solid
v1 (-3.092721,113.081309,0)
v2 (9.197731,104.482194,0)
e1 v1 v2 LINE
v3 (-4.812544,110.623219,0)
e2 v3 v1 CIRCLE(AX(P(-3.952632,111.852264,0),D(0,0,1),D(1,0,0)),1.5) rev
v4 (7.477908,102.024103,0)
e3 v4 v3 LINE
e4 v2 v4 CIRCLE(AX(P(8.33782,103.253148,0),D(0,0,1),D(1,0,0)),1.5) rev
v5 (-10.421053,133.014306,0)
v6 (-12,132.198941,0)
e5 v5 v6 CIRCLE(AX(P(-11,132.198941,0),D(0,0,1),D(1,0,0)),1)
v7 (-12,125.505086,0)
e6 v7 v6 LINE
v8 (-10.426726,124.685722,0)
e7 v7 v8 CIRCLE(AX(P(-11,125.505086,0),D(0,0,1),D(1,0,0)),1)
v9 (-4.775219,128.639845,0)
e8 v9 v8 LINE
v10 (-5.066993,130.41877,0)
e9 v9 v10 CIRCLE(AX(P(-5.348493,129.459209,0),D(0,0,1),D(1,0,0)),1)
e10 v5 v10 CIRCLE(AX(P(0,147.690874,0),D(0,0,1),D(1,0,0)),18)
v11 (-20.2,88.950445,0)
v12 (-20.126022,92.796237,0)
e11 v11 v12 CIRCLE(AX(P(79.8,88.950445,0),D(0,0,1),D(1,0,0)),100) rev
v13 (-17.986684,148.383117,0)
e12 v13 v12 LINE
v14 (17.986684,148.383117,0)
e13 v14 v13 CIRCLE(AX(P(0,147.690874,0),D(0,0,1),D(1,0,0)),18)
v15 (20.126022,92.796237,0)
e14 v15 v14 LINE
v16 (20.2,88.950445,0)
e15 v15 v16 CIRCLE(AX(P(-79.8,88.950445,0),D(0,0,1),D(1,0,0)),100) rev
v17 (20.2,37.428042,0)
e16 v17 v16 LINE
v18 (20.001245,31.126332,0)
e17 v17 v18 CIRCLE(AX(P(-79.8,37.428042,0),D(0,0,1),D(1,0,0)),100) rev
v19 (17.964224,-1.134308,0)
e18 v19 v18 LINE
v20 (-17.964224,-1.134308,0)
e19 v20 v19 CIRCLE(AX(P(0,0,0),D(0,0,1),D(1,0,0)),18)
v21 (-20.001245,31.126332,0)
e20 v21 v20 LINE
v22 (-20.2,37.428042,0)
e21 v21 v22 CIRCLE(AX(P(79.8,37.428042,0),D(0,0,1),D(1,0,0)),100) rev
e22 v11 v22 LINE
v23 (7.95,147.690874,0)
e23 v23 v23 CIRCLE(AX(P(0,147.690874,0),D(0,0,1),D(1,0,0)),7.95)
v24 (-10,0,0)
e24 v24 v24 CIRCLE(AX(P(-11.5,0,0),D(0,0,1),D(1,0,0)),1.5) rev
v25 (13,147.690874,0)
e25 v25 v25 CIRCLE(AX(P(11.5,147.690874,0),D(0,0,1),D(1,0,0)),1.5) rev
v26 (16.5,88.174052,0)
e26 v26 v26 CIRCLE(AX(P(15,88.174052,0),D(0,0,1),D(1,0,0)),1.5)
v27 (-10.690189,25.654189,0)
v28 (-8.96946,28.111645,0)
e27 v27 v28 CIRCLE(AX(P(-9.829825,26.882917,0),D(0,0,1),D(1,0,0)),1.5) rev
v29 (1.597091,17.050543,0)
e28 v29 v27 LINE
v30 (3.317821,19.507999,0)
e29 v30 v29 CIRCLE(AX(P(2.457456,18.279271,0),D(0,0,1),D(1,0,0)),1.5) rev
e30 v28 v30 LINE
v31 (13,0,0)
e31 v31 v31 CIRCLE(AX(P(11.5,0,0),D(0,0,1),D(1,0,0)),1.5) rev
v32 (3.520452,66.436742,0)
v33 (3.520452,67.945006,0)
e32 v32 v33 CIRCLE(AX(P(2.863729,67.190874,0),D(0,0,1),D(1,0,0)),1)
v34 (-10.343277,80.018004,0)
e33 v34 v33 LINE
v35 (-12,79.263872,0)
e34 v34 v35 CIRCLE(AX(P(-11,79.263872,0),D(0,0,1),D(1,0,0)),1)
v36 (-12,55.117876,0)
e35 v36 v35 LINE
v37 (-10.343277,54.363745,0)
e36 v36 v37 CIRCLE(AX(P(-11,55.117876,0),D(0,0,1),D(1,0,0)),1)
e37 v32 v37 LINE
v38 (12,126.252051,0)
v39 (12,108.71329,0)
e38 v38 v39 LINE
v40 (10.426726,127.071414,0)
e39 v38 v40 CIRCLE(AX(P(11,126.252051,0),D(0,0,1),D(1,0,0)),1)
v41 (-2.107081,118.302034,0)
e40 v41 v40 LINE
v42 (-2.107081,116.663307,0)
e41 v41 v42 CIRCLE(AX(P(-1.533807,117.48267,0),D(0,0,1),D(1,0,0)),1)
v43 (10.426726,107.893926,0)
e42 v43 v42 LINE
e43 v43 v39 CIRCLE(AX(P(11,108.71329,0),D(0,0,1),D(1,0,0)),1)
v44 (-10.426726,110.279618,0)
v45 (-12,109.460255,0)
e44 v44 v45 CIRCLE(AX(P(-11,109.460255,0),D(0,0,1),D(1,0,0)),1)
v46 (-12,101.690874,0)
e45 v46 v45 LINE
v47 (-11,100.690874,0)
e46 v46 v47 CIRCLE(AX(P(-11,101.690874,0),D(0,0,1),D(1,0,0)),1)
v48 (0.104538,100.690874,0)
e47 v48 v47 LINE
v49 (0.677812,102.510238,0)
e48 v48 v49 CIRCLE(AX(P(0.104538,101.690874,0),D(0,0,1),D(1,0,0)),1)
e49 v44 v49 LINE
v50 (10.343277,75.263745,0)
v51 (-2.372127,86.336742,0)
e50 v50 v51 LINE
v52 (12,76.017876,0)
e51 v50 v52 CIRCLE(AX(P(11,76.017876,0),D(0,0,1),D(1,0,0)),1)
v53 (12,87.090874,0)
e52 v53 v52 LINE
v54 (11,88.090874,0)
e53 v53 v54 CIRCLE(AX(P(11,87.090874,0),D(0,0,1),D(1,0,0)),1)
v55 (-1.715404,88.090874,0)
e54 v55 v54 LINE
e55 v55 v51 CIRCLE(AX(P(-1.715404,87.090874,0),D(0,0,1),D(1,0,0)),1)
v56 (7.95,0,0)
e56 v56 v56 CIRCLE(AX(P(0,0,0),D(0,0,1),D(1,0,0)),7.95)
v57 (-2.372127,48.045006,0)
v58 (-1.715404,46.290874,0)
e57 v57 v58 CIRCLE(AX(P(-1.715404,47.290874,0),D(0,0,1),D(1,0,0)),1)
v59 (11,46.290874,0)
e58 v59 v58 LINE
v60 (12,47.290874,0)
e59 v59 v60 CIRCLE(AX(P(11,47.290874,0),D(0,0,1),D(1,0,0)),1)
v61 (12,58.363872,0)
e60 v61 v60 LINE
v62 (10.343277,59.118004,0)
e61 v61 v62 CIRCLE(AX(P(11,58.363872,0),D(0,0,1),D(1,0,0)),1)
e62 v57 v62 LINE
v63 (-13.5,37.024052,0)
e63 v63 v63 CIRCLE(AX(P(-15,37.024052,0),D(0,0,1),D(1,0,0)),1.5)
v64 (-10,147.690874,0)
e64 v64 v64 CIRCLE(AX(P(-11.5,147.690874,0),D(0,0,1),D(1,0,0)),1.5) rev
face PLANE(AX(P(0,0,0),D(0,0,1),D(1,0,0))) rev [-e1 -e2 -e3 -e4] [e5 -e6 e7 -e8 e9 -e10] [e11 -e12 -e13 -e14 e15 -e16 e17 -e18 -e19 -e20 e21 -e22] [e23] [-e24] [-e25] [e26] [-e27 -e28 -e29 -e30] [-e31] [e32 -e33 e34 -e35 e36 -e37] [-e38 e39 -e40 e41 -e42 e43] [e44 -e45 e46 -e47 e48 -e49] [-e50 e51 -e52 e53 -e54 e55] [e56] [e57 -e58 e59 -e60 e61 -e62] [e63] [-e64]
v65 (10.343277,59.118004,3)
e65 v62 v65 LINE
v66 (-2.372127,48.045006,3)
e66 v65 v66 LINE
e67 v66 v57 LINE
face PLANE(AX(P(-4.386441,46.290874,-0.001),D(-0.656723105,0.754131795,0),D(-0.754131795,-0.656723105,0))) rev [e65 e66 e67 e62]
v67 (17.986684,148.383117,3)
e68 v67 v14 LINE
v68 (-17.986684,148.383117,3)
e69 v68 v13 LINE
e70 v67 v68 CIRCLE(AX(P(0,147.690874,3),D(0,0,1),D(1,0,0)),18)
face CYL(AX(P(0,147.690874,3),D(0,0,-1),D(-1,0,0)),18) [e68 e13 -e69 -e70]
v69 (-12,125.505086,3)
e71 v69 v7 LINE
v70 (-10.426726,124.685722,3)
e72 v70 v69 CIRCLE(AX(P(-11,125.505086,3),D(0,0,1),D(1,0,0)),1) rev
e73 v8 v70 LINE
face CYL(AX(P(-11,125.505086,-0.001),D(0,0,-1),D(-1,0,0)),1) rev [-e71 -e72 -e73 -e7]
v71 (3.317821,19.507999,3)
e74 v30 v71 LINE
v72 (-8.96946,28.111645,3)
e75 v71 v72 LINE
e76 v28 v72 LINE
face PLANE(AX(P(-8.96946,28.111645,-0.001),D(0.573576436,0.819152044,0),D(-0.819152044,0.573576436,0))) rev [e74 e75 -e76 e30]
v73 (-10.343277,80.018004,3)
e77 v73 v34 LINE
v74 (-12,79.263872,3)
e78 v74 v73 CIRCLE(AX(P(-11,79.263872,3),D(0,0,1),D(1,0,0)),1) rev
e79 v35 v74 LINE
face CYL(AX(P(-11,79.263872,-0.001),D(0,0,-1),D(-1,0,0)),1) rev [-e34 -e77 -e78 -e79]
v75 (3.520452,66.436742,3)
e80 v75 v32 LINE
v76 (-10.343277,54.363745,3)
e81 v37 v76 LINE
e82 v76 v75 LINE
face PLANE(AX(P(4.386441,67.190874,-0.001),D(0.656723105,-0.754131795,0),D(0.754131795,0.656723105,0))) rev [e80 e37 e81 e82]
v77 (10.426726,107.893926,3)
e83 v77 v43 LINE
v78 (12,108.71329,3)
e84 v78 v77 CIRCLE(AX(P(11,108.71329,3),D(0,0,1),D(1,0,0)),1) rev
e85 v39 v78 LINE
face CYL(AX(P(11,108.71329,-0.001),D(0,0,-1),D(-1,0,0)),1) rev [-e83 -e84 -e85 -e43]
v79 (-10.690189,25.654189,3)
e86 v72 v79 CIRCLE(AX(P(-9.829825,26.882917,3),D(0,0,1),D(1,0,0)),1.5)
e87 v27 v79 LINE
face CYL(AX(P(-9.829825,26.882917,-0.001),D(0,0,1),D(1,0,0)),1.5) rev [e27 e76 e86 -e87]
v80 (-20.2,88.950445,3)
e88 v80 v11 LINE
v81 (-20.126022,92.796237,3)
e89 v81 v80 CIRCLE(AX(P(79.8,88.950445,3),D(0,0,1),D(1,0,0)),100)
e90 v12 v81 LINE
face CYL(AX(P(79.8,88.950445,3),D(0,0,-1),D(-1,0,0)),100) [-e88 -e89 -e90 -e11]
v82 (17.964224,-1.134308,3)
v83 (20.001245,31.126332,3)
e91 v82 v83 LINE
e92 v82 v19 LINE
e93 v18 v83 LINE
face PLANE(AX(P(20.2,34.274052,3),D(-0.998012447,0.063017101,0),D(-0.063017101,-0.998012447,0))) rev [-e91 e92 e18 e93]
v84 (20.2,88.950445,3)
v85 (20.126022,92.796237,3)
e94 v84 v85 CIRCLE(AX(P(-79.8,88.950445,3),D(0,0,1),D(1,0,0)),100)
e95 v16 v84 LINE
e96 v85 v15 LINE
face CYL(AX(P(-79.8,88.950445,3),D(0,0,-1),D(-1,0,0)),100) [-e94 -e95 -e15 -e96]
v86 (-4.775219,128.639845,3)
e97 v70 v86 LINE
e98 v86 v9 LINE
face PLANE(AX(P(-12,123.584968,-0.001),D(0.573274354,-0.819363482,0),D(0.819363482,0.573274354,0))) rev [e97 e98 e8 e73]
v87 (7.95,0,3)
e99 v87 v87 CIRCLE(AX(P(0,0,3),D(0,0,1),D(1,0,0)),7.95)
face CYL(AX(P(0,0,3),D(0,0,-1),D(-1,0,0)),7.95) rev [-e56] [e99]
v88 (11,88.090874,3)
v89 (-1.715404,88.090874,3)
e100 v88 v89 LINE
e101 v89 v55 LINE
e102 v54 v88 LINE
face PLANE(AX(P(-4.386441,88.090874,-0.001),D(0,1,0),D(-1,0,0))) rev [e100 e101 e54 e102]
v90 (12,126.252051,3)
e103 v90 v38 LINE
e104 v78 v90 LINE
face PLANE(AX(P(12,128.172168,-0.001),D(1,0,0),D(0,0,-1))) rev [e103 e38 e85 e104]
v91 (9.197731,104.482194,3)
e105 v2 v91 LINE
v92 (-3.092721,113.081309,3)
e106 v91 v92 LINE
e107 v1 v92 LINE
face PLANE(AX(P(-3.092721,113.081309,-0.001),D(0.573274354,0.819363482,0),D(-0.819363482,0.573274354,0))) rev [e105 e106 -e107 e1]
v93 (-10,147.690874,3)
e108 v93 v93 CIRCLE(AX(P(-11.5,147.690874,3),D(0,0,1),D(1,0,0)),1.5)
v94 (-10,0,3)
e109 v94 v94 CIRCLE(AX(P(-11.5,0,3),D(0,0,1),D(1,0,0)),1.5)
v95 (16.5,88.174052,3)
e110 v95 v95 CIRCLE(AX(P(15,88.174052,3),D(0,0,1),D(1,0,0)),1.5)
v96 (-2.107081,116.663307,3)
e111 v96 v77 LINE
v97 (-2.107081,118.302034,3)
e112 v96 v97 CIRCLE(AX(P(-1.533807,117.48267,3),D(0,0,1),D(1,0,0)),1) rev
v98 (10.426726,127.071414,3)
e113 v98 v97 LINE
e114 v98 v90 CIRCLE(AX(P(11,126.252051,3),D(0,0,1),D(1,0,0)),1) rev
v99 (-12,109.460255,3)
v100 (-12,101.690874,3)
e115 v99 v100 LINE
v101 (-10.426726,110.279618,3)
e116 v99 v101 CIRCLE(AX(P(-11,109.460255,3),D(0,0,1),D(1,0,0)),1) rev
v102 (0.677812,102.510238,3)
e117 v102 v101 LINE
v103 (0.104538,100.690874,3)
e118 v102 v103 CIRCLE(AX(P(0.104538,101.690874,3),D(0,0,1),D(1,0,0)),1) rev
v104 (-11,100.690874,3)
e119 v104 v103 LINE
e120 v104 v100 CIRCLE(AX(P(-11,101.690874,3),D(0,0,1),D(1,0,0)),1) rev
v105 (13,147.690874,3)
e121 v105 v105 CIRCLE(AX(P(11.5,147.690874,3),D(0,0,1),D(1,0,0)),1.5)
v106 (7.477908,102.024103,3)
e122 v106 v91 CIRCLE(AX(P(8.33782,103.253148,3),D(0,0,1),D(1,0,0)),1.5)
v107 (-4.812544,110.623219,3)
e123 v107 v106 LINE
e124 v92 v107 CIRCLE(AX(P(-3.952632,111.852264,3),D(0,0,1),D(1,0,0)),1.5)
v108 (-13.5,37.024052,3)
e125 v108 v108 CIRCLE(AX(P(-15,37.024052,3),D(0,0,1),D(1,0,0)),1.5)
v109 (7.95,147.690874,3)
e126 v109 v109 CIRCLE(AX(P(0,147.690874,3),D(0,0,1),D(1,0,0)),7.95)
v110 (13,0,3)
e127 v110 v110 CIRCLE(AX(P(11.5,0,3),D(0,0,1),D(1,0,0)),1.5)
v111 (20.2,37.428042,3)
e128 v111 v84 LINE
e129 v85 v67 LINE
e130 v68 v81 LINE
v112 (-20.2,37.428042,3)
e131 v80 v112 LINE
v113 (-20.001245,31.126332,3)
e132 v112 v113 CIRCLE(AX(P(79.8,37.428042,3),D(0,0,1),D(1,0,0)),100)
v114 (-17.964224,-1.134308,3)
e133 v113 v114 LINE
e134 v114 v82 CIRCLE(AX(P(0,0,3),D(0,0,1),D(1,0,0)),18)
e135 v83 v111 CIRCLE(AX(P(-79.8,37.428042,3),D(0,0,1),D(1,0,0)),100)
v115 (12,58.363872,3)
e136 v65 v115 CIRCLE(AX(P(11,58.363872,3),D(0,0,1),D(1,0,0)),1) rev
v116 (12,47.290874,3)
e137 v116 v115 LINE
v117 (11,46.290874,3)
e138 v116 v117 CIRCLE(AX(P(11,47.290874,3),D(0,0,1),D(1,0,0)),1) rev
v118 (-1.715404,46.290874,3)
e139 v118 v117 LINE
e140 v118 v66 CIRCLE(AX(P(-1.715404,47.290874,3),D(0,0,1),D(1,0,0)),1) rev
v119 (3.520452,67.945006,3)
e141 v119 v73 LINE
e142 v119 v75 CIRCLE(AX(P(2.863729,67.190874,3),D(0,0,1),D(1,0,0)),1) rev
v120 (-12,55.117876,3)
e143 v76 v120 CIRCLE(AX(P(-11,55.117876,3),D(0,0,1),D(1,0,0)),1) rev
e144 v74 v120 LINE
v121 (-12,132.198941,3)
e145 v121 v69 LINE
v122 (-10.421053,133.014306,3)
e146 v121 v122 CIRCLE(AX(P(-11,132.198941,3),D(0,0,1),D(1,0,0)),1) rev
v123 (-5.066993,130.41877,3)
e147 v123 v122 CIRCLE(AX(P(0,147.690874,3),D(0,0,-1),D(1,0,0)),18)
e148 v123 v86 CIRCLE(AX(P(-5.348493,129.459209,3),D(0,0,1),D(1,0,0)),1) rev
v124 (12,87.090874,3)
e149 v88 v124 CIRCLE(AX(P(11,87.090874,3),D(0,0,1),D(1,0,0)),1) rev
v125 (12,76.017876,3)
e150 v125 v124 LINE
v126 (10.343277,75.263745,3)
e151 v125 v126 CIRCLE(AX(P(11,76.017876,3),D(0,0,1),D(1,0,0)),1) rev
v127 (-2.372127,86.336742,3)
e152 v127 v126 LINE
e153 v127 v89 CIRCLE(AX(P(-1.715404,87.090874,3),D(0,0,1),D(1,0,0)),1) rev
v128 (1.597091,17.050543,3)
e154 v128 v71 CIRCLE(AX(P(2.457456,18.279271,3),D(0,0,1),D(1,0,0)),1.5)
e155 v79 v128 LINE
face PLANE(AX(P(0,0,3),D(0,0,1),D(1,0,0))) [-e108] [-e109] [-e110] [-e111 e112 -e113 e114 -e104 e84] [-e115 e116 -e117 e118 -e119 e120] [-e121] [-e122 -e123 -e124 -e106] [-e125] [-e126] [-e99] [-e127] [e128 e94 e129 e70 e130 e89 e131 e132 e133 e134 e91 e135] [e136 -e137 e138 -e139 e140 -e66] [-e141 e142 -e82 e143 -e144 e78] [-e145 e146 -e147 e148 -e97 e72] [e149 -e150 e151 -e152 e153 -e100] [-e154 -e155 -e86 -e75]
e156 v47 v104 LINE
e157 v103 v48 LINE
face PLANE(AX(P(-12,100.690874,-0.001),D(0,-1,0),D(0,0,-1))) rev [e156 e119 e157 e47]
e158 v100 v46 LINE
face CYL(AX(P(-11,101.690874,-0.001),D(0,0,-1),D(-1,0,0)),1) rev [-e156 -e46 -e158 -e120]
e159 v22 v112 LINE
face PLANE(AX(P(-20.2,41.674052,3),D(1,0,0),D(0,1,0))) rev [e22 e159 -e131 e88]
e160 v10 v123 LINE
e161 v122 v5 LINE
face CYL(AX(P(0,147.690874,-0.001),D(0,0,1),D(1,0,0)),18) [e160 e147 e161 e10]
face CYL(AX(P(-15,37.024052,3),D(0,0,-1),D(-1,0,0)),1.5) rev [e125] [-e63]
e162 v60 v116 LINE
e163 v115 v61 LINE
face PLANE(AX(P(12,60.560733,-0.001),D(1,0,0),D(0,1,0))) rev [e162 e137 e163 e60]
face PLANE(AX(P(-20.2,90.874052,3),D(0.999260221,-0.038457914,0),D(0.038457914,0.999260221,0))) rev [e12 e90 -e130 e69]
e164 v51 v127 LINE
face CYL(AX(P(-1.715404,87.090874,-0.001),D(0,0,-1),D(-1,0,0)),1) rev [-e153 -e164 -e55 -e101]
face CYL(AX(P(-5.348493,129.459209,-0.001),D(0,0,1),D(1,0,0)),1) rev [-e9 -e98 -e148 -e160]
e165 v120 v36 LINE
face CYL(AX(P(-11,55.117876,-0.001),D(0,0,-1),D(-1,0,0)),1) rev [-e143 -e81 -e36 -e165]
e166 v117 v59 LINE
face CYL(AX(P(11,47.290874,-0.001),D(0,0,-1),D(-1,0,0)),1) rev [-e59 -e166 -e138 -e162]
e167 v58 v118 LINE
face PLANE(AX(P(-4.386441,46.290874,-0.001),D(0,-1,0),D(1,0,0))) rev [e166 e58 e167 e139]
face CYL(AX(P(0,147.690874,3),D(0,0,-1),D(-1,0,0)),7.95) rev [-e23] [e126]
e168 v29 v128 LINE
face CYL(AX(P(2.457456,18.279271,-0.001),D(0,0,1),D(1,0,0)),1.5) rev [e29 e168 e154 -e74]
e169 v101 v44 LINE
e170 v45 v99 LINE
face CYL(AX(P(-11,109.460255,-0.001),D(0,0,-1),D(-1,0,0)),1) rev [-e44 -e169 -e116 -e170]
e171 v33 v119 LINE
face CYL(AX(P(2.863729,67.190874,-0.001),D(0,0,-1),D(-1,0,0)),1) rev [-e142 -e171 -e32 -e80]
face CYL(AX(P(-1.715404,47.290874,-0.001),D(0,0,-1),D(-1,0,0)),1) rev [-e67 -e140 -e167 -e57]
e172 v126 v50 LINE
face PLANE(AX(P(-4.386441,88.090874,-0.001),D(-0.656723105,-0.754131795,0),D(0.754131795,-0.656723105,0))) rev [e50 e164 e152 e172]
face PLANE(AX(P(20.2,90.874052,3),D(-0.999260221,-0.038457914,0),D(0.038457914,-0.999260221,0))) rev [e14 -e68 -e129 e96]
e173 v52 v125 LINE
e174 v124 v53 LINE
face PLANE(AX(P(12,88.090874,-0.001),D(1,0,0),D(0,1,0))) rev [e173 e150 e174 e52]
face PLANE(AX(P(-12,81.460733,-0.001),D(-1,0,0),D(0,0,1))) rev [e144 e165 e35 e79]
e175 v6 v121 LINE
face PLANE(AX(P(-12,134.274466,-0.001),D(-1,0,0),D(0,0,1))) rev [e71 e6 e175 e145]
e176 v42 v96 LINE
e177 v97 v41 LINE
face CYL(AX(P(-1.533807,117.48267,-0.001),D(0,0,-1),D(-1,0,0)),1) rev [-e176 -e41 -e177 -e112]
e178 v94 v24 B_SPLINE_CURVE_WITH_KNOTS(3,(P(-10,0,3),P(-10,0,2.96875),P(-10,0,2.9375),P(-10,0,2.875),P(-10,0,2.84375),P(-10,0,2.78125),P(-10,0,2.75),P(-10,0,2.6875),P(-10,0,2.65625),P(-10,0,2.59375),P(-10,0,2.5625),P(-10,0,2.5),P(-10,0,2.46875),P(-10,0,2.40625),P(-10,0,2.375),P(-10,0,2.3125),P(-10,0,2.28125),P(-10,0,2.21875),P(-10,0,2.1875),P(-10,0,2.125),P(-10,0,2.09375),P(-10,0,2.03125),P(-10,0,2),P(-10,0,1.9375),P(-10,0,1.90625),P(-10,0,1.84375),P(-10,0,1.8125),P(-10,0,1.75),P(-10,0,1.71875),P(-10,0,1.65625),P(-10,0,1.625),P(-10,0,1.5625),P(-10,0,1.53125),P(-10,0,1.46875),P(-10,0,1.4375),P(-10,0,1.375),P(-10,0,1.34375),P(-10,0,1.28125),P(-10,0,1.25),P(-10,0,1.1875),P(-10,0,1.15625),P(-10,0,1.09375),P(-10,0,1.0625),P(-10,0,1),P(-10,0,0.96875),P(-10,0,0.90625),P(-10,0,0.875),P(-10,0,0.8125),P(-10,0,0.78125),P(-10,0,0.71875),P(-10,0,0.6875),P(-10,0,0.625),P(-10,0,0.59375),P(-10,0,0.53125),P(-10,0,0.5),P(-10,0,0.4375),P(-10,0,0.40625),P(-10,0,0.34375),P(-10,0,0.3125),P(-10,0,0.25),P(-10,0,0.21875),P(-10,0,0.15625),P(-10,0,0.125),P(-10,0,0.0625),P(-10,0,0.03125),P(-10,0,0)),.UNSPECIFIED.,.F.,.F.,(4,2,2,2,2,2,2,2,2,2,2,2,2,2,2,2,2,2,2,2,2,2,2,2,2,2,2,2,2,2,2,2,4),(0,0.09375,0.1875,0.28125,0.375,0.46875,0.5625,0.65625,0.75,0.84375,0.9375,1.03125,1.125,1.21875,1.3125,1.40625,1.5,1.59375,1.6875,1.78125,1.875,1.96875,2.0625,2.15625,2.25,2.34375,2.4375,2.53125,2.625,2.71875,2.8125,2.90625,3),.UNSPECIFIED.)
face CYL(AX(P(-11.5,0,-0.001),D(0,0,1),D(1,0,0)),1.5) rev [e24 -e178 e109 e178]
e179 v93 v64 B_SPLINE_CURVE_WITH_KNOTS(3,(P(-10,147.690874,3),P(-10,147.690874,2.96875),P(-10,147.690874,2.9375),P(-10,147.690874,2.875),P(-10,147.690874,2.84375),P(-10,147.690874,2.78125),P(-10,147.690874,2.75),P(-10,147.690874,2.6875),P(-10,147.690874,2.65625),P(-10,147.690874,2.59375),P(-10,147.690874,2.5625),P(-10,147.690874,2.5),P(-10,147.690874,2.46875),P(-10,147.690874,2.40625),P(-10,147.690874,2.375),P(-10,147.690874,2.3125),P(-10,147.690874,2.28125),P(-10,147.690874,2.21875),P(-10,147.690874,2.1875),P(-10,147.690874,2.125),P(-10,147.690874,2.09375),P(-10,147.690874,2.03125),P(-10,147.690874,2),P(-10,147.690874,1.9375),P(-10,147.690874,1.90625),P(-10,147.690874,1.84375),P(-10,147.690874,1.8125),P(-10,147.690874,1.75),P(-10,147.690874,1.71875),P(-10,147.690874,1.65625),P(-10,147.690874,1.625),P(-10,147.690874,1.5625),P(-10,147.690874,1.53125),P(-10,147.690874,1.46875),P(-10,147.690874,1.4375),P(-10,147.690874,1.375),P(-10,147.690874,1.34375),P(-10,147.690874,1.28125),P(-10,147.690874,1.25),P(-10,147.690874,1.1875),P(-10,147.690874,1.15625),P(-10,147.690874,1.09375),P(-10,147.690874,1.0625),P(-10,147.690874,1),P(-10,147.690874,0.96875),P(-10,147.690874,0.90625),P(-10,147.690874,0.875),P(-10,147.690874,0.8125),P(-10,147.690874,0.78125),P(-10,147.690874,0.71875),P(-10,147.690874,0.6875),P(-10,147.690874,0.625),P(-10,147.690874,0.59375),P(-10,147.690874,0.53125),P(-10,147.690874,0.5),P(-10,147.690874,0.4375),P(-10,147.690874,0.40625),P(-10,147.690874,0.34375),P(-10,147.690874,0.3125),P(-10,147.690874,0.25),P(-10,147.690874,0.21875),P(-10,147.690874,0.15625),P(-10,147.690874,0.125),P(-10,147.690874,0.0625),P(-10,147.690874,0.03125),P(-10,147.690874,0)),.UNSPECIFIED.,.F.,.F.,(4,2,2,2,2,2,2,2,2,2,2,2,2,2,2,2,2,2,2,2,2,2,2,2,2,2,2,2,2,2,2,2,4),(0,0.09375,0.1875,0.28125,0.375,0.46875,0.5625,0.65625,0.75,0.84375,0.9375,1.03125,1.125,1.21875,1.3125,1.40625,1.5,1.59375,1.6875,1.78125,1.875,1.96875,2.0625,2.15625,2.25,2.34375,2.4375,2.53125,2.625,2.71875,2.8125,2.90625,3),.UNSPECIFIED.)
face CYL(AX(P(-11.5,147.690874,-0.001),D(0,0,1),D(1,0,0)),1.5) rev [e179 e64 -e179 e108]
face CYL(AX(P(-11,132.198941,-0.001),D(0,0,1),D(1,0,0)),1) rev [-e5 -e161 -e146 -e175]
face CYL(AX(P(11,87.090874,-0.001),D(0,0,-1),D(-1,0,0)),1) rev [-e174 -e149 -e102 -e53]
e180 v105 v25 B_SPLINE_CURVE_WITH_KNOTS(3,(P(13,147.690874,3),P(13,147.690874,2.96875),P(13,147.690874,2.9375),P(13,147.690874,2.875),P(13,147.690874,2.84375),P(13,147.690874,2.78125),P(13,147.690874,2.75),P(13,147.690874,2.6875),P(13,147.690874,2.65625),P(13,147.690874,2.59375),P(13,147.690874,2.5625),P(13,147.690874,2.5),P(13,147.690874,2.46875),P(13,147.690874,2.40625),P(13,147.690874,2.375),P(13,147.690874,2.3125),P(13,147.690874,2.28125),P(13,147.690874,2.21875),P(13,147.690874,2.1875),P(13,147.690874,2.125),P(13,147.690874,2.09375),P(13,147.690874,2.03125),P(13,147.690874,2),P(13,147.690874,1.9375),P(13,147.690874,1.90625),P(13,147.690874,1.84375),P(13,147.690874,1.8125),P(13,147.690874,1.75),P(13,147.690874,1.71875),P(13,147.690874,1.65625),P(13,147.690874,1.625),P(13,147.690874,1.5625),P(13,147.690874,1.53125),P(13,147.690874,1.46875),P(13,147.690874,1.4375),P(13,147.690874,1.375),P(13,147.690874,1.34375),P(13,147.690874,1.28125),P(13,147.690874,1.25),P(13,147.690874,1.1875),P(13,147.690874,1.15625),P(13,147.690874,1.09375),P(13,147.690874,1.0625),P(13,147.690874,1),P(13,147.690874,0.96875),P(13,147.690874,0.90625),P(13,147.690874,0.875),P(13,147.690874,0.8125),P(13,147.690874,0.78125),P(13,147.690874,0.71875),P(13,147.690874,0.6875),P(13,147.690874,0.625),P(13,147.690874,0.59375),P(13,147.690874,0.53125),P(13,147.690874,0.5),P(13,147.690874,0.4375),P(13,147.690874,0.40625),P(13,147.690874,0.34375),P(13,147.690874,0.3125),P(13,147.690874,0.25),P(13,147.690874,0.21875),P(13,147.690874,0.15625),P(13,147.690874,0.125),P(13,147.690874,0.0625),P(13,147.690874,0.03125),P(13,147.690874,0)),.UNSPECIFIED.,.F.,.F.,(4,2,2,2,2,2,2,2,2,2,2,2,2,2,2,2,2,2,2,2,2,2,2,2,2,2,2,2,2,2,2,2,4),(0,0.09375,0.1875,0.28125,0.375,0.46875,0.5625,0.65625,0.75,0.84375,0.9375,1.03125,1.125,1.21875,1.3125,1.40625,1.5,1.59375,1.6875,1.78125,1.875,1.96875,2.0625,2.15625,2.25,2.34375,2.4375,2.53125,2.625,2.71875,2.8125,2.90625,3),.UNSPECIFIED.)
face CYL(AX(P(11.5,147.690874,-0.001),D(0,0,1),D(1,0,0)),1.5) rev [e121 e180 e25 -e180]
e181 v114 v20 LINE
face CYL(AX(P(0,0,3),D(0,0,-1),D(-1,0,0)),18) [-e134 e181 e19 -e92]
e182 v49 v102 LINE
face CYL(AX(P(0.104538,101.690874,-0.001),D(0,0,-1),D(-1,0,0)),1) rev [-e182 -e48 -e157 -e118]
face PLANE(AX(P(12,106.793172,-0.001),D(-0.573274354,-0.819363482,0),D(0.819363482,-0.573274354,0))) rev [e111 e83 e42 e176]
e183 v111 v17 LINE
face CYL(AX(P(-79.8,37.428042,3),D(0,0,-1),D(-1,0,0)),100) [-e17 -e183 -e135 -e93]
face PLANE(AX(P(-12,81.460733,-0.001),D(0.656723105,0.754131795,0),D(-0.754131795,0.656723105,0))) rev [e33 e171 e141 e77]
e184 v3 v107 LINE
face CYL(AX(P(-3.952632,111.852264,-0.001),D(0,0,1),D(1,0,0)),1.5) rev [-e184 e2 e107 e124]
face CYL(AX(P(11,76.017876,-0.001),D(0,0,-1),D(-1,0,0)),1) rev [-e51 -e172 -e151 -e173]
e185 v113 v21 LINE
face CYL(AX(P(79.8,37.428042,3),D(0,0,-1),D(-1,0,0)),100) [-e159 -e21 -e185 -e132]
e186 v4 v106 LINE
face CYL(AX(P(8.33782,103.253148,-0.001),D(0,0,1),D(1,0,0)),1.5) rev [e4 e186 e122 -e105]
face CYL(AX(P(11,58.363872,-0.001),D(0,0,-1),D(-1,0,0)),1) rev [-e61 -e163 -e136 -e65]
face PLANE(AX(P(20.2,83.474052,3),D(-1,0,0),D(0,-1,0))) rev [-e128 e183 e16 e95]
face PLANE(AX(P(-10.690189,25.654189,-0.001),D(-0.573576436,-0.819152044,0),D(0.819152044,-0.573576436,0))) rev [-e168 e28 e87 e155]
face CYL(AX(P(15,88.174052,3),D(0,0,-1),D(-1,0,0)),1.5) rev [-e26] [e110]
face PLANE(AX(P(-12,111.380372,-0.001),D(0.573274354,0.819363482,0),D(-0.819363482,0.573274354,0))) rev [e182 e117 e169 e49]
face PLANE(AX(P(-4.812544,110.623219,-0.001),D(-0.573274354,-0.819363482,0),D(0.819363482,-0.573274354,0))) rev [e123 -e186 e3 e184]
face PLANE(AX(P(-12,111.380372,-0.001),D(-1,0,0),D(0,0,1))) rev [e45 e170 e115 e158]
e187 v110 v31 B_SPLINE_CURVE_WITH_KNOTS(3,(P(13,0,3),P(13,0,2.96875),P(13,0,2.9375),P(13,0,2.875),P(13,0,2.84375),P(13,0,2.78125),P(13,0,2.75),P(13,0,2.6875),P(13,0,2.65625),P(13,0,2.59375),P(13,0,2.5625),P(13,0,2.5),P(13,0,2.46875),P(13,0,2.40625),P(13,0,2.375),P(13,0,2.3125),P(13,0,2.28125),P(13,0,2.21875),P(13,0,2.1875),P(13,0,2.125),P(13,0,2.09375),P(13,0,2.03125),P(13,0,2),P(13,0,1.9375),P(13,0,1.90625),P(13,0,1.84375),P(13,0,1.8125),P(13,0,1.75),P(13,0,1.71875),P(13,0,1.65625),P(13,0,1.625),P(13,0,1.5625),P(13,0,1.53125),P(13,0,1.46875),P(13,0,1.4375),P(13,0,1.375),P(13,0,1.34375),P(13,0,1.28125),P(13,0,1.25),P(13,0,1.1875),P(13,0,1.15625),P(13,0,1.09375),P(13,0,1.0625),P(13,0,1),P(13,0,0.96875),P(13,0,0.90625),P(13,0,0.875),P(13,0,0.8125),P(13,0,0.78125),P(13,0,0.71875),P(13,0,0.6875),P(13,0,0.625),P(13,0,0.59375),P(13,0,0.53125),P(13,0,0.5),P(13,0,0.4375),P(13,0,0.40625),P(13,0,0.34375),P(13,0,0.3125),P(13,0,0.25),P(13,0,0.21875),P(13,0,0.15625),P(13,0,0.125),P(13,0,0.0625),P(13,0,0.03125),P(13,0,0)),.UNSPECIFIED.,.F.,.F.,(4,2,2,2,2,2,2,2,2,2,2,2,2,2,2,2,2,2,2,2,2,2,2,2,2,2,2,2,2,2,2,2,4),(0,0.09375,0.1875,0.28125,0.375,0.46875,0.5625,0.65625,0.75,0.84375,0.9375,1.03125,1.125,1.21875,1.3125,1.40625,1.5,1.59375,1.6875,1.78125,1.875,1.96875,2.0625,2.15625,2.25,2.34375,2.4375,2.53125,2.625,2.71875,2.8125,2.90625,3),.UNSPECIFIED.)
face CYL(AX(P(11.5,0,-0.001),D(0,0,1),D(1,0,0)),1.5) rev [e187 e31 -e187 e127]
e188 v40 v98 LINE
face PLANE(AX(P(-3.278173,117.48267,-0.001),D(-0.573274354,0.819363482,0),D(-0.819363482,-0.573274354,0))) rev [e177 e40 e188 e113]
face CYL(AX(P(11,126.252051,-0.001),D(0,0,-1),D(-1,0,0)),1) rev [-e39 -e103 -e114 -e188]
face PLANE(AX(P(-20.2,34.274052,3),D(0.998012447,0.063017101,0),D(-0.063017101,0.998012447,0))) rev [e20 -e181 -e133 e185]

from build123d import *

# Parameters (mm, degrees)
SKETCH1_R               = 7.95
SKETCH1_R_2             = 1.5
MAIN_BODY_LINK_B1_DEPTH = 3
CUT_EXTRUDE2_REACH      = 168.945
CUT_EXTRUDE3_REACH      = 168.945
SKETCH5_R               = 1.5
PULLEYIDLERUP_DEPTH     = 3
CUT_EXTRUDE5_DEPTH      = 3
FILLET4_R               = 1
FILLET5_R               = 100


with BuildPart() as part:
    # Sketch1 → Main Body Link B1 (new body)
    with BuildSketch(Plane.XY):
        with BuildLine():
            Line((20.2, 41.674052381), (20.2, 83.474052381))
            Line((20.2, 83.474052381), (20.2, 90.874052381))
            Line((20.2, 90.874052381), (17.986683974, 148.383116621))
            ThreePointArc((17.986683974, 148.383116621), (0, 165.690874165), (-17.986683974, 148.383116621))
            Line((-17.986683974, 148.383116621), (-20.2, 90.874052381))
            Line((-20.2, 90.874052381), (-20.2, 83.474052381))
            Line((-20.2, 83.474052381), (-20.2, 41.674052381))
            Line((-20.2, 41.674052381), (-20.2, 34.274052381))
            Line((-20.2, 34.274052381), (-17.964224051, -1.134307826))
            ThreePointArc((-17.964224051, -1.134307826), (0, -18), (17.964224051, -1.134307826))
            Line((17.964224051, -1.134307826), (20.2, 34.274052381))
            Line((20.2, 34.274052381), (20.2, 41.674052381))
        make_face()
        Circle(SKETCH1_R, mode=Mode.SUBTRACT)
        with Locations((15, 88.174052381)):
            Circle(SKETCH1_R_2, mode=Mode.SUBTRACT)
        with Locations((-15, 37.024052381)):
            Circle(SKETCH1_R_2, mode=Mode.SUBTRACT)
        with Locations((0, 147.690874165)):
            Circle(SKETCH1_R, mode=Mode.SUBTRACT)
    extrude(amount=MAIN_BODY_LINK_B1_DEPTH)

    # Sketch4 → Cut-Extrude2 (cut, up to next)
    with BuildSketch(Plane.XY.offset(3), mode=Mode.PRIVATE) as cut_extrude2_sk1:
        with BuildLine():
            Line((-12, 134.2744663), (-12, 123.584968066))
            Line((-12, 123.584968066), (-2.929911079, 129.930929878))
            ThreePointArc((-2.929911079, 129.930929878), (-7.774454217, 131.456408925), (-12, 134.2744663))
        make_face()
    cut_extrude2_tool1 = extrude(cut_extrude2_sk1.sketch, amount=-CUT_EXTRUDE2_REACH, mode=Mode.PRIVATE) & part.part
    # Sketch4 → Cut-Extrude2 (cut, up to next)
    with BuildSketch(Plane.XY.offset(3), mode=Mode.PRIVATE) as cut_extrude2_sk2:
        Polygon((-12, 100.690874165), (3.278172542, 100.690874165), (-12, 111.380372399), align=None)
    cut_extrude2_tool2 = extrude(cut_extrude2_sk2.sketch, amount=-CUT_EXTRUDE2_REACH, mode=Mode.PRIVATE) & part.part
    # Sketch4 → Cut-Extrude2 (cut, up to next)
    with BuildSketch(Plane.XY.offset(3), mode=Mode.PRIVATE) as cut_extrude2_sk3:
        Polygon((12, 128.172168466), (12, 106.793171999), (-3.278172542, 117.482670232), align=None)
    cut_extrude2_tool3 = extrude(cut_extrude2_sk3.sketch, amount=-CUT_EXTRUDE2_REACH, mode=Mode.PRIVATE) & part.part
    # Sketch4 → Cut-Extrude2 (cut, up to next)
    with BuildSketch(Plane.XY.offset(3), mode=Mode.PRIVATE) as cut_extrude2_sk4:
        Polygon((-4.386441158, 88.090874165), (12, 88.090874165), (12, 73.82101499), align=None)
    cut_extrude2_tool4 = extrude(cut_extrude2_sk4.sketch, amount=-CUT_EXTRUDE2_REACH, mode=Mode.PRIVATE) & part.part
    # Sketch4 → Cut-Extrude2 (cut, up to next)
    with BuildSketch(Plane.XY.offset(3), mode=Mode.PRIVATE) as cut_extrude2_sk5:
        Polygon((-12, 81.46073334), (-12, 52.92101499), (4.386441158, 67.190874165), align=None)
    cut_extrude2_tool5 = extrude(cut_extrude2_sk5.sketch, amount=-CUT_EXTRUDE2_REACH, mode=Mode.PRIVATE) & part.part
    # Sketch4 → Cut-Extrude2 (cut, up to next)
    with BuildSketch(Plane.XY.offset(3), mode=Mode.PRIVATE) as cut_extrude2_sk6:
        Polygon((-4.386441158, 46.290874165), (12, 46.290874165), (12, 60.56073334), align=None)
    cut_extrude2_tool6 = extrude(cut_extrude2_sk6.sketch, amount=-CUT_EXTRUDE2_REACH, mode=Mode.PRIVATE) & part.part
    add(cut_extrude2_tool1.solids().sort_by_distance((-9.12997, 128.978342, 3))[0], mode=Mode.SUBTRACT)
    add(cut_extrude2_tool2.solids().sort_by_distance((-6.907276, 104.25404, 3))[0], mode=Mode.SUBTRACT)
    add(cut_extrude2_tool3.solids().sort_by_distance((6.907276, 117.48267, 3))[0], mode=Mode.SUBTRACT)
    add(cut_extrude2_tool4.solids().sort_by_distance((6.537853, 83.334254, 3))[0], mode=Mode.SUBTRACT)
    add(cut_extrude2_tool5.solids().sort_by_distance((-6.537853, 67.190874, 3))[0], mode=Mode.SUBTRACT)
    add(cut_extrude2_tool6.solids().sort_by_distance((6.537853, 51.047494, 3))[0], mode=Mode.SUBTRACT)

    # Sketch5 → Cut-Extrude3 (cut, up to next)
    with BuildSketch(Plane.XY.offset(3), mode=Mode.PRIVATE) as cut_extrude3_sk1:
        with Locations((11.5, 147.690874165)):
            Circle(SKETCH5_R)
    cut_extrude3_tool1 = extrude(cut_extrude3_sk1.sketch, amount=-CUT_EXTRUDE3_REACH, mode=Mode.PRIVATE) & part.part
    # Sketch5 → Cut-Extrude3 (cut, up to next)
    with BuildSketch(Plane.XY.offset(3), mode=Mode.PRIVATE) as cut_extrude3_sk2:
        with Locations((-11.5, 147.690874165)):
            Circle(SKETCH5_R)
    cut_extrude3_tool2 = extrude(cut_extrude3_sk2.sketch, amount=-CUT_EXTRUDE3_REACH, mode=Mode.PRIVATE) & part.part
    # Sketch5 → Cut-Extrude3 (cut, up to next)
    with BuildSketch(Plane.XY.offset(3), mode=Mode.PRIVATE) as cut_extrude3_sk3:
        with Locations((-11.5, 0)):
            Circle(SKETCH5_R)
    cut_extrude3_tool3 = extrude(cut_extrude3_sk3.sketch, amount=-CUT_EXTRUDE3_REACH, mode=Mode.PRIVATE) & part.part
    # Sketch5 → Cut-Extrude3 (cut, up to next)
    with BuildSketch(Plane.XY.offset(3), mode=Mode.PRIVATE) as cut_extrude3_sk4:
        with Locations((11.5, 0)):
            Circle(SKETCH5_R)
    cut_extrude3_tool4 = extrude(cut_extrude3_sk4.sketch, amount=-CUT_EXTRUDE3_REACH, mode=Mode.PRIVATE) & part.part
    add(cut_extrude3_tool1.solids().sort_by_distance((11.5, 147.690874, 3))[0], mode=Mode.SUBTRACT)
    add(cut_extrude3_tool2.solids().sort_by_distance((-11.5, 147.690874, 3))[0], mode=Mode.SUBTRACT)
    add(cut_extrude3_tool3.solids().sort_by_distance((-11.5, 0, 3))[0], mode=Mode.SUBTRACT)
    add(cut_extrude3_tool4.solids().sort_by_distance((11.5, 0, 3))[0], mode=Mode.SUBTRACT)

    # Sketch6 → PulleyIdlerUp (cut)
    with BuildSketch(Plane.XY.offset(3)):
        with BuildLine():
            Line((-4.812543936, 110.623218529), (7.477908291, 102.024103222))
            ThreePointArc((7.477908291, 102.024103222), (9.566865044, 102.393236914), (9.197731352, 104.482193668))
            Line((9.197731352, 104.482193668), (-3.092720875, 113.081308975))
            ThreePointArc((-3.092720875, 113.081308975), (-5.181677628, 112.712175283), (-4.812543936, 110.623218529))
        make_face()
    extrude(amount=-PULLEYIDLERUP_DEPTH, mode=Mode.SUBTRACT)

    # Sketch7 → Cut-Extrude5 (cut)
    with BuildSketch(Plane.XY.offset(3)):
        with BuildLine():
            Line((-10.690189186, 25.65418917), (1.597091478, 17.050542625))
            ThreePointArc((1.597091478, 17.050542625), (3.686184199, 17.418906036), (3.317820787, 19.507998757))
            Line((3.317820787, 19.507998757), (-8.969459877, 28.111645303))
            ThreePointArc((-8.969459877, 28.111645303), (-11.058552598, 27.743281891), (-10.690189186, 25.65418917))
        make_face()
    extrude(amount=-CUT_EXTRUDE5_DEPTH, mode=Mode.SUBTRACT)

    # Fillet4
    fillet4_edges = [part.edges().sort_by_distance(p)[0] for p in [
        (-12, 81.46073334, 1.5),
        (4.386441158, 67.190874165, 1.5),
        (-12, 52.92101499, 1.5),
        (-12, 134.2744663, 1.5),
        (-2.929911079, 129.930929878, 1.5),
        (-12, 123.584968066, 1.5),
        (-12, 100.690874165, 1.5),
        (-12, 111.380372399, 1.5),
        (3.278172542, 100.690874165, 1.5),
        (12, 106.793171999, 1.5),
        (-3.278172542, 117.482670232, 1.5),
        (12, 128.172168466, 1.5),
        (12, 60.56073334, 1.5),
        (12, 46.290874165, 1.5),
        (-4.386441158, 46.290874165, 1.5),
        (12, 88.090874165, 1.5),
        (12, 73.82101499, 1.5),
        (-4.386441158, 88.090874165, 1.5),
    ]]
    fillet(fillet4_edges, radius=FILLET4_R)

    # Fillet5
    # the kernel refuses this fillet: 100 mm, written as the material it takes off along each edge
    with BuildSketch(Plane(origin=(-20.2, 34.274052381, -7.884973578), x_dir=(0, 1, 0), z_dir=(0, 0, 1))) as fillet5_piece_1:
        with BuildLine():
            CenterArc((FILLET5_R * 0.0315398943126, -FILLET5_R), FILLET5_R, 90, 3.613007947)
            Line((-FILLET5_R * 0.0314772071099, -FILLET5_R * 0.00198755271875), (0, 0))
            Line((0, 0), (FILLET5_R * 0.0315398943126, 0))
        make_face()
    extrude(amount=18.769947156, mode=Mode.SUBTRACT)
    with BuildSketch(Plane(origin=(-20.2, 90.874052381, -4.809018086), x_dir=(0.03845791424359976, 0.9992602207793684, 0), z_dir=(0, 0, 1))) as fillet5_piece_2:
        with BuildLine():
            CenterArc((FILLET5_R * 0.0192360723451, -FILLET5_R), FILLET5_R, 90, 2.204019698)
            Line((-FILLET5_R * 0.0192218418985, -FILLET5_R * 0.000739779220632), (0, 0))
            Line((0, 0), (FILLET5_R * 0.0192360723451, 0))
        make_face()
    extrude(amount=12.618036173, mode=Mode.SUBTRACT)
    with BuildSketch(Plane(origin=(20.2, 90.874052381, -4.809018086), x_dir=(-0.03845791424359111, 0.9992602207793686, 0), z_dir=(0, 0, 1))) as fillet5_piece_3:
        with BuildLine():
            CenterArc((FILLET5_R * 0.0192360723451, FILLET5_R), FILLET5_R, 267.795980302, 2.204019698)
            Line((-FILLET5_R * 0.0192218418985, FILLET5_R * 0.000739779220631), (0, 0))
            Line((0, 0), (FILLET5_R * 0.0192360723451, 0))
        make_face()
    extrude(amount=12.618036173, mode=Mode.SUBTRACT)
    with BuildSketch(Plane(origin=(20.2, 34.274052381, -7.884973578), x_dir=(0, 1, 0), z_dir=(0, 0, 1))) as fillet5_piece_4:
        with BuildLine():
            CenterArc((FILLET5_R * 0.0315398943126, FILLET5_R), FILLET5_R, 266.386992053, 3.613007947)
            Line((-FILLET5_R * 0.0314772071099, FILLET5_R * 0.00198755271875), (0, 0))
            Line((0, 0), (FILLET5_R * 0.0315398943126, 0))
        make_face()
    extrude(amount=18.769947156, mode=Mode.SUBTRACT)


solid = part.part
